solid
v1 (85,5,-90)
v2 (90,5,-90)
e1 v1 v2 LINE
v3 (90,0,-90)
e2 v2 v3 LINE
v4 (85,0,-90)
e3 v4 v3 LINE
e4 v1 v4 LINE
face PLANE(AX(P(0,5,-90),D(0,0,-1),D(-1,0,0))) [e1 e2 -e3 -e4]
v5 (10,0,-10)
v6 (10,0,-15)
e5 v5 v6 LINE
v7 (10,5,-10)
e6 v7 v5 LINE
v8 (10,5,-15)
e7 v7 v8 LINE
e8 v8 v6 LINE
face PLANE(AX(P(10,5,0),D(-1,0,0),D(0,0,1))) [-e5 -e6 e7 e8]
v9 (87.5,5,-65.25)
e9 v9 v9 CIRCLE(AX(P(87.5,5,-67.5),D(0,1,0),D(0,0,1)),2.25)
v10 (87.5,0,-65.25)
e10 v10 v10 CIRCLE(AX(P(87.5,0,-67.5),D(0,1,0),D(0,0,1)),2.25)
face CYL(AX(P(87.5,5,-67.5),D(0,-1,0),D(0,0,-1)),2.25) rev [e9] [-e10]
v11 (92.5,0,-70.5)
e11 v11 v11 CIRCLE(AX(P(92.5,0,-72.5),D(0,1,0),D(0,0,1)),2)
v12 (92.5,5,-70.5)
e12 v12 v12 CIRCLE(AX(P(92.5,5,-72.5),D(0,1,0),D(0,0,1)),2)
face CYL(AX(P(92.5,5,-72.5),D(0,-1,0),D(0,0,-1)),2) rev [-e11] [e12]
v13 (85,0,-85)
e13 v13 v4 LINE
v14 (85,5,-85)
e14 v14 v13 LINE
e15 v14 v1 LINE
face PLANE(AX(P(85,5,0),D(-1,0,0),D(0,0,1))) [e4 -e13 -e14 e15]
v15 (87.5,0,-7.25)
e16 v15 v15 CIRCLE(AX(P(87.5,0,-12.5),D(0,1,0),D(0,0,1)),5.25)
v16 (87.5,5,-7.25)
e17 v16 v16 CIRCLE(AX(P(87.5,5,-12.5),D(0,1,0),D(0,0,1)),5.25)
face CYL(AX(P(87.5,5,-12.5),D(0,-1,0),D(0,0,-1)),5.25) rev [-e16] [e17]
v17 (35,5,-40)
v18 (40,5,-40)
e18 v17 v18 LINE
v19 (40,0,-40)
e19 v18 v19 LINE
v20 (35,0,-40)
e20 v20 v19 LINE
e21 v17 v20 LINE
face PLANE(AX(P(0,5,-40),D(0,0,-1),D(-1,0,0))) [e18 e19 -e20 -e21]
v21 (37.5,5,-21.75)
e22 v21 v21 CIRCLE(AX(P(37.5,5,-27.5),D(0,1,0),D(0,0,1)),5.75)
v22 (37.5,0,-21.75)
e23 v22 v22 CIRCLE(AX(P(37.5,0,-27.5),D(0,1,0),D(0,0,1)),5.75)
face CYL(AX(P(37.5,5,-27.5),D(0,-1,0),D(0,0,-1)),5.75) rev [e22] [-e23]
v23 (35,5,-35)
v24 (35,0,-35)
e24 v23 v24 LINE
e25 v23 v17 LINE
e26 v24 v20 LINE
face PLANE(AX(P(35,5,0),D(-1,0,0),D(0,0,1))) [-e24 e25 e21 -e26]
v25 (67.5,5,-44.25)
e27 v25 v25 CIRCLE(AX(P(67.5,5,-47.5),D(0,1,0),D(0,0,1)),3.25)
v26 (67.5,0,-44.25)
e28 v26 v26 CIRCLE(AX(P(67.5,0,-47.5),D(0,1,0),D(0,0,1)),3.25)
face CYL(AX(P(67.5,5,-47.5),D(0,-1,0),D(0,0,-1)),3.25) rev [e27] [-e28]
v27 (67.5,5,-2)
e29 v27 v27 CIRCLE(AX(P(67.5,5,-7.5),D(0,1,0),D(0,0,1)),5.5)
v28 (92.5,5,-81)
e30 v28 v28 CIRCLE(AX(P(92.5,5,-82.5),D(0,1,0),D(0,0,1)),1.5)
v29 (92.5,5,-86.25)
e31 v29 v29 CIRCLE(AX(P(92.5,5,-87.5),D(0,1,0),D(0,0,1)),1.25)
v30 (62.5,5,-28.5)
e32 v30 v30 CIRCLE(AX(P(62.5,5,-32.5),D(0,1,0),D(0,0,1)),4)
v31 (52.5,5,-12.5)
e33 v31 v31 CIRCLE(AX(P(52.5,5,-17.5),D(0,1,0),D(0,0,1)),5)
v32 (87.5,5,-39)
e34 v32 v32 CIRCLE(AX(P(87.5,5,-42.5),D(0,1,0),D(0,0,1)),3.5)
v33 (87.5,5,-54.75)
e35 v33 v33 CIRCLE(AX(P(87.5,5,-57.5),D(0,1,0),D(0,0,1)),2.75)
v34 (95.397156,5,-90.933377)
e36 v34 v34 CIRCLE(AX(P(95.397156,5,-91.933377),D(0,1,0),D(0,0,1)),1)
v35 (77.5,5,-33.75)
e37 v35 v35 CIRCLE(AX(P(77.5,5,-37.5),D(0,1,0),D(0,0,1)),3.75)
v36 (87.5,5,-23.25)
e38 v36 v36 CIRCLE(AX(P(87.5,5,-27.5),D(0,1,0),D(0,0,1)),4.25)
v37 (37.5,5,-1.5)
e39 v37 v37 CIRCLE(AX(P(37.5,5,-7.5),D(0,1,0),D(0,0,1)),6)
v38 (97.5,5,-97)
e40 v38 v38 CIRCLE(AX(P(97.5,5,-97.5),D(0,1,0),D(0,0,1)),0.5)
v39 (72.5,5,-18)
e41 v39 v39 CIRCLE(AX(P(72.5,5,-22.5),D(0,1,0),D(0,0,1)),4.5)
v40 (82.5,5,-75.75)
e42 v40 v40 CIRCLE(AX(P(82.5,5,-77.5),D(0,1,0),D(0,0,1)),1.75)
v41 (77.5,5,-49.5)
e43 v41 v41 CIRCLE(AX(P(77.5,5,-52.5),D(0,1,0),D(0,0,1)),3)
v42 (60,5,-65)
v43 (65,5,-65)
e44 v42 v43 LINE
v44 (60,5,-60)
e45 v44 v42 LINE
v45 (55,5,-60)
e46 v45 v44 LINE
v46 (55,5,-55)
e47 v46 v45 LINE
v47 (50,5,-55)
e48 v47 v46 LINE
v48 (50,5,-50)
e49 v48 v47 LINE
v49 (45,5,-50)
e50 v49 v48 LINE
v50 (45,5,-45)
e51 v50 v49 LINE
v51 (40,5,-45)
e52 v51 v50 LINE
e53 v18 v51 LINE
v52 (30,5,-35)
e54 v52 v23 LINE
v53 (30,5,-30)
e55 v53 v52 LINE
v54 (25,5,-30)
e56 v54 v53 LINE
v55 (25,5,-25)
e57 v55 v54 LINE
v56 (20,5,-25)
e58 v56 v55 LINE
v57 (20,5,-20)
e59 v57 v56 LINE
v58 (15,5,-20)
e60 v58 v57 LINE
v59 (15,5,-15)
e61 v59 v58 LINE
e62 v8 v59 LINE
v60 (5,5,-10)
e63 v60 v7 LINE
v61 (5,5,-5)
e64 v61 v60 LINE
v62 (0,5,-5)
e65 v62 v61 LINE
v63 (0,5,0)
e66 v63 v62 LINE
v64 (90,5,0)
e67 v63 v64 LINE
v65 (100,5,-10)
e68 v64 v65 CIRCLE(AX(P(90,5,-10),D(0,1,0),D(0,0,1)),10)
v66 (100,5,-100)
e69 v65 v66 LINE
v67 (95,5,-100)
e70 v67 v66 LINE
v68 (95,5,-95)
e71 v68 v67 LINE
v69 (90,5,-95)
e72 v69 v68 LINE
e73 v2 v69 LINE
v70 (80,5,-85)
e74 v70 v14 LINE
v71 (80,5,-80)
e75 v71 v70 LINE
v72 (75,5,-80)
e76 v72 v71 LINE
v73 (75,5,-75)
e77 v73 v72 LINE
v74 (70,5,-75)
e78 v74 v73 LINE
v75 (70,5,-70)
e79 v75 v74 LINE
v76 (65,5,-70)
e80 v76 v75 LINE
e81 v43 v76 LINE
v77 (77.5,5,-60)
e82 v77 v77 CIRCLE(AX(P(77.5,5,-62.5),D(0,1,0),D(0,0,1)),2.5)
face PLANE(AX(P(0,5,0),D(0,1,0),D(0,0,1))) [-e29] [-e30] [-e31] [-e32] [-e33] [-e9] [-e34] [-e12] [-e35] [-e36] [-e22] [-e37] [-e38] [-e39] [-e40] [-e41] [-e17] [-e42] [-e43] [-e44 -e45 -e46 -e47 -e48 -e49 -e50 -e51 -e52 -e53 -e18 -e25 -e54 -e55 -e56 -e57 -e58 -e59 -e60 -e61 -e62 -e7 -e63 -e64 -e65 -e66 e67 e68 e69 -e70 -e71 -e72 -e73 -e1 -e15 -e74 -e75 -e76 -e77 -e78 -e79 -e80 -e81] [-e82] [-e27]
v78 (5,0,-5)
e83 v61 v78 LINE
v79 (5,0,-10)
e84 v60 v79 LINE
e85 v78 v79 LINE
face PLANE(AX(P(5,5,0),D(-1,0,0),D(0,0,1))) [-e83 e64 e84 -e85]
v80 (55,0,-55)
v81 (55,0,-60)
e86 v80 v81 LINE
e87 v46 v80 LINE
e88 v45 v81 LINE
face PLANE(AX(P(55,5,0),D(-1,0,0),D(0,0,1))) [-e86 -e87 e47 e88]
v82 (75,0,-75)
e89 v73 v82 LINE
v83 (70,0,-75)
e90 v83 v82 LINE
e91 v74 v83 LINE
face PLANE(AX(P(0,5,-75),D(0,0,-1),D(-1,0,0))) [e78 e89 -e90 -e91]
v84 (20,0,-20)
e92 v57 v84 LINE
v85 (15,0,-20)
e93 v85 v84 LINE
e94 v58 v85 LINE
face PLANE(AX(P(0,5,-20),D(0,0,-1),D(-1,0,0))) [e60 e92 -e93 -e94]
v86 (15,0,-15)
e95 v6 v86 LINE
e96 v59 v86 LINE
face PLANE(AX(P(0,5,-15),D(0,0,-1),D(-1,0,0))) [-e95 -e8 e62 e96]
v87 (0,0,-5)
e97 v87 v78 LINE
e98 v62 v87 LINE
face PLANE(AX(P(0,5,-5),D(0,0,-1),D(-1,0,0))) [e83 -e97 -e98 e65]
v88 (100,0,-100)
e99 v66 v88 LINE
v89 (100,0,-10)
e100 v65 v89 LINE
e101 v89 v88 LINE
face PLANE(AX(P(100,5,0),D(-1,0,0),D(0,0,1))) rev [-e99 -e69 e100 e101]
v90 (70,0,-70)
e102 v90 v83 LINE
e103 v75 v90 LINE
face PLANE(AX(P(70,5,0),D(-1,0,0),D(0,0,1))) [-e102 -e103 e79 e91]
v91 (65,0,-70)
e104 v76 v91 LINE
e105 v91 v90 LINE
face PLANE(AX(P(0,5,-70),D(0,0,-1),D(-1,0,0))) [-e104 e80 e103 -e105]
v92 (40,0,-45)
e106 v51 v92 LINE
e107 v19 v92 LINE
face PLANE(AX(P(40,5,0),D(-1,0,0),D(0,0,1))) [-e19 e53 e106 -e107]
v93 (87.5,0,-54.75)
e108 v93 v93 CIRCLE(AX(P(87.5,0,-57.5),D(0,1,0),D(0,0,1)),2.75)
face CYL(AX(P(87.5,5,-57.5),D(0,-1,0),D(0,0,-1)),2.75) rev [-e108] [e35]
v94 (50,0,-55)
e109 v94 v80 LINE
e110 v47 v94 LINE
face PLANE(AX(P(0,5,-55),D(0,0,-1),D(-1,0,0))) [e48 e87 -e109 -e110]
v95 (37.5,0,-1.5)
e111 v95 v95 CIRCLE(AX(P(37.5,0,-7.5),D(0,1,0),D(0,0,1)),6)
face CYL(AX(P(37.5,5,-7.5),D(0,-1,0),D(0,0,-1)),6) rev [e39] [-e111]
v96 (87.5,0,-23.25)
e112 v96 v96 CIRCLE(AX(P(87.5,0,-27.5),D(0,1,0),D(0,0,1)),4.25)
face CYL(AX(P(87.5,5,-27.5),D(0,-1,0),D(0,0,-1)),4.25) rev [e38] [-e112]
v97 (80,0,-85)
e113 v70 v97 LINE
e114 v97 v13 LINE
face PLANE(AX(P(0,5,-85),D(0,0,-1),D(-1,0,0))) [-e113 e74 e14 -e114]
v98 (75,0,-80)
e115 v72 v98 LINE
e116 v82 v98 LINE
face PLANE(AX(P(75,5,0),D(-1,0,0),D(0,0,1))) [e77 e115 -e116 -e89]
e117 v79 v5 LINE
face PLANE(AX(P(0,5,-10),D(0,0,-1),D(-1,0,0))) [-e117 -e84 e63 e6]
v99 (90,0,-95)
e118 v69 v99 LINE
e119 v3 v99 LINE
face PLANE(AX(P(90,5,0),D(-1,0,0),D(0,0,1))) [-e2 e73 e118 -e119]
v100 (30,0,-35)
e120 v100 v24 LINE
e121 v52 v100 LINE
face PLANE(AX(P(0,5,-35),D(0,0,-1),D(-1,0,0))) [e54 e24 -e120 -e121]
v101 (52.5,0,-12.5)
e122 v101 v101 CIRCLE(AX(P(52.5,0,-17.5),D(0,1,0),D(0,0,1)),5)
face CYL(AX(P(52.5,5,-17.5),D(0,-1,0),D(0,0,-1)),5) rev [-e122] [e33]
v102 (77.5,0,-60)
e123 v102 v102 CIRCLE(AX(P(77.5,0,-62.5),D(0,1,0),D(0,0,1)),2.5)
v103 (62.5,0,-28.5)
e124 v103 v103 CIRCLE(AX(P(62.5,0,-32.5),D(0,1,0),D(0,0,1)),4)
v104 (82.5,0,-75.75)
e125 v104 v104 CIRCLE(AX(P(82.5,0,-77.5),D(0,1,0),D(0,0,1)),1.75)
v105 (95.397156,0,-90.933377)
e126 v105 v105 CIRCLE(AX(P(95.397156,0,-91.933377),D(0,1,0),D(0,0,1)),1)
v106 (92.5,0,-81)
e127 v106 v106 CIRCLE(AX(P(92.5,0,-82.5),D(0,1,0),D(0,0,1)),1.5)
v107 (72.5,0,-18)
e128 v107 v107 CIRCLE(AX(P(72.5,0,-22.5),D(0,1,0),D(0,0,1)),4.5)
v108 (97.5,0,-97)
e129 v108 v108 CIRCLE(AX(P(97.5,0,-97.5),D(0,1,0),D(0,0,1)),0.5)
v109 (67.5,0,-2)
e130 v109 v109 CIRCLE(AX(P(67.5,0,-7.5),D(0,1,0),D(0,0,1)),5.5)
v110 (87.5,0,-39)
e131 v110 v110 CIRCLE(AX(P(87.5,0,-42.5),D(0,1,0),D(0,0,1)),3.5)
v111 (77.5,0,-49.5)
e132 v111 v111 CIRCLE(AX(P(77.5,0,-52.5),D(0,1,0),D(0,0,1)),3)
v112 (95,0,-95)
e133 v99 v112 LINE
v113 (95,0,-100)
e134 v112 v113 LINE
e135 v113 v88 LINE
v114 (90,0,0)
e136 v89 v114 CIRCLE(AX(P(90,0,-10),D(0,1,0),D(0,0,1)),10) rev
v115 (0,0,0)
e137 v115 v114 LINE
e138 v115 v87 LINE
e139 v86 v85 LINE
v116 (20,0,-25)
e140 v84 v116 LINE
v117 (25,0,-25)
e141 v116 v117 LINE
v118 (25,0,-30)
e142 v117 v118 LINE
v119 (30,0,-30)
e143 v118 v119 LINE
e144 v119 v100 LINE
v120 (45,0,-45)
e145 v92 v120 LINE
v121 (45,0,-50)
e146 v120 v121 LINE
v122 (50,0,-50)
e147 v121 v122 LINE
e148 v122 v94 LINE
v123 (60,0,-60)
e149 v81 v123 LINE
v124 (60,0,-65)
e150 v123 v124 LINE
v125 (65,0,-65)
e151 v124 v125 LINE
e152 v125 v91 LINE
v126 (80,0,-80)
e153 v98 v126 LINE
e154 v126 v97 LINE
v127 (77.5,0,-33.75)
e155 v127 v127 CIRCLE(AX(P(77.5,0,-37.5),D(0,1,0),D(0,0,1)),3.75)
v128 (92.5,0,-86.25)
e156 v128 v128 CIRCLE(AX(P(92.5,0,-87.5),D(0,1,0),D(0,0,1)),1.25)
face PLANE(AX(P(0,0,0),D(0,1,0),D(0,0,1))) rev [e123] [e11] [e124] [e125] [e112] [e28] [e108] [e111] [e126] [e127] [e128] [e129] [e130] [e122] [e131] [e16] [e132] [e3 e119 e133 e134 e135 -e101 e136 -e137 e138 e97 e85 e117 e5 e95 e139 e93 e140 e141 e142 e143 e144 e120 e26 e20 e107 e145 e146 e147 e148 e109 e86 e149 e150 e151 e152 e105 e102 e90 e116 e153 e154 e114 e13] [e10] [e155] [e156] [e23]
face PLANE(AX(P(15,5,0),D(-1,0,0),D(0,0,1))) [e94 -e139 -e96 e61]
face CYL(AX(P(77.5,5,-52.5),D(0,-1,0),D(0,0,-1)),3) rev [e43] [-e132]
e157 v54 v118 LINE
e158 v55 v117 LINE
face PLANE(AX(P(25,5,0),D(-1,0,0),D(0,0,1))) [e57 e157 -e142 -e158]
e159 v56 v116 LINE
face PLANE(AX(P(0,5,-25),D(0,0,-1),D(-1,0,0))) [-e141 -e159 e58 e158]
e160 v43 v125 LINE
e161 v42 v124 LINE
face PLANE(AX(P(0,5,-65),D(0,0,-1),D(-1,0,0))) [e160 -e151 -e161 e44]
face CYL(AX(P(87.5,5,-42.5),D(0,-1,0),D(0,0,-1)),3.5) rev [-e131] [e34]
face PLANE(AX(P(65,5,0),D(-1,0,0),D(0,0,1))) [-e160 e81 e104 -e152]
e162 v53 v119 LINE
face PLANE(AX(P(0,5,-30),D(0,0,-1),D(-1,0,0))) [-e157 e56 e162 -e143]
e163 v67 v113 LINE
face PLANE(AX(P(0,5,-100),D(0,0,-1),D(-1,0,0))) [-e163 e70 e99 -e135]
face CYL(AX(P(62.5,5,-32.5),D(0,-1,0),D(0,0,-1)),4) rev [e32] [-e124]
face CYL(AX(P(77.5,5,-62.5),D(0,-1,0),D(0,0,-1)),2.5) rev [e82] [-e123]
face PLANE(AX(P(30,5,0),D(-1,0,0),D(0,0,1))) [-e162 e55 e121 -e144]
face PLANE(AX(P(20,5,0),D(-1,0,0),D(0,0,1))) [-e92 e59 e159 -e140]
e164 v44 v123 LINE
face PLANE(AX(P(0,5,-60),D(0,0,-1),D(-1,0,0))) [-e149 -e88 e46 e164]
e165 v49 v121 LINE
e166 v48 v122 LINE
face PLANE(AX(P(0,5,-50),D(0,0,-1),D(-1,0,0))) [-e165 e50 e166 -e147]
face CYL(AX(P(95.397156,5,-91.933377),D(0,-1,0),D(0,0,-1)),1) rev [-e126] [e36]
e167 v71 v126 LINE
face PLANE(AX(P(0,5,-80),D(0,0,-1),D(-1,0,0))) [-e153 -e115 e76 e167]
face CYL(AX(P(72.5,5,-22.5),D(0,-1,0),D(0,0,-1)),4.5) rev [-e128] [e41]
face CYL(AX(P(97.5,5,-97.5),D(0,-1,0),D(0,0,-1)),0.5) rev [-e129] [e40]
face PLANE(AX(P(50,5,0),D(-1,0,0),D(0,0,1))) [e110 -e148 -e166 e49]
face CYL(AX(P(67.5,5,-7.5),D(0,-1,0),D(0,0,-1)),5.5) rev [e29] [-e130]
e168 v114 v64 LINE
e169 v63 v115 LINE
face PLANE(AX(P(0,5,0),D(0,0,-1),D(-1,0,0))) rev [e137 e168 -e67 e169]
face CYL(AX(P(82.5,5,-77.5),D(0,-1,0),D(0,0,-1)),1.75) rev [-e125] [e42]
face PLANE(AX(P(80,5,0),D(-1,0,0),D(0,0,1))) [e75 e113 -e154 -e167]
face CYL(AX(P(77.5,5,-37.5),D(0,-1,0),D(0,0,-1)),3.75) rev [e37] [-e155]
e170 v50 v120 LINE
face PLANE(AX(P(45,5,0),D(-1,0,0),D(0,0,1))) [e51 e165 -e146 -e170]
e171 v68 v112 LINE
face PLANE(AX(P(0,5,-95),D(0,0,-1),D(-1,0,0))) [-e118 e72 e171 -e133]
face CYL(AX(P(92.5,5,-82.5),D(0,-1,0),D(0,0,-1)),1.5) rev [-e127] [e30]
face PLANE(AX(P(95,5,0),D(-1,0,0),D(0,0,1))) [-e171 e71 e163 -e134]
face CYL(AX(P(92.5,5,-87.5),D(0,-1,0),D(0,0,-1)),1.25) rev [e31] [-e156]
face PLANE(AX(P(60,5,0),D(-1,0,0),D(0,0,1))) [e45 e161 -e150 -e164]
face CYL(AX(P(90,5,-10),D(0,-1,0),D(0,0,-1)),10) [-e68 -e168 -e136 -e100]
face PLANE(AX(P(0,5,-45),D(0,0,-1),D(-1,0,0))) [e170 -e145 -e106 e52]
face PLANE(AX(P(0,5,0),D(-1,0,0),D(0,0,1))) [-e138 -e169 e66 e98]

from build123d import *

# Parameters (mm, degrees)
BOSS_EXTRUDE1_OUTLINE_R    = 6
BOSS_EXTRUDE1_OUTLINE_R_2  = 5.75
BOSS_EXTRUDE1_OUTLINE_R_3  = 5.5
BOSS_EXTRUDE1_OUTLINE_R_4  = 5
BOSS_EXTRUDE1_OUTLINE_R_5  = 4.5
BOSS_EXTRUDE1_OUTLINE_R_6  = 5.25
BOSS_EXTRUDE1_OUTLINE_R_7  = 4
BOSS_EXTRUDE1_OUTLINE_R_8  = 3.25
BOSS_EXTRUDE1_OUTLINE_R_9  = 4.25
BOSS_EXTRUDE1_OUTLINE_R_10 = 3.75
BOSS_EXTRUDE1_OUTLINE_R_11 = 3.5
BOSS_EXTRUDE1_OUTLINE_R_12 = 3
BOSS_EXTRUDE1_OUTLINE_R_13 = 2.75
BOSS_EXTRUDE1_OUTLINE_R_14 = 2.5
BOSS_EXTRUDE1_OUTLINE_R_15 = 2.25
BOSS_EXTRUDE1_OUTLINE_R_16 = 2
BOSS_EXTRUDE1_OUTLINE_R_17 = 1.75
BOSS_EXTRUDE1_OUTLINE_R_18 = 1.5
BOSS_EXTRUDE1_OUTLINE_R_19 = 1.25
BOSS_EXTRUDE1_OUTLINE_R_20 = 1
BOSS_EXTRUDE1_OUTLINE_R_21 = 0.5
BOSS_EXTRUDE1_DEPTH        = 5
FILLET1_R                  = 10


# Read off the part's stored shape, not the designer's step: Boss-Extrude1
with BuildPart() as part:
    # Boss-Extrude1 outline → Boss-Extrude1 (new body)
    with BuildSketch(Plane(origin=(0, 0, 0), x_dir=(1, 0, 0), z_dir=(0, 1, 0))):
        Polygon((60, 65), (60, 60), (55, 60), (55, 55), (50, 55), (50, 50), (45, 50), (45, 45), (40, 45), (40, 40), (35, 40), (35, 35), (30, 35), (30, 30), (25, 30), (25, 25), (20, 25), (20, 20), (15, 20), (15, 15), (10, 15), (10, 10), (5, 10), (5, 5), (0, 5), (0, 0), (100, 0), (100, 100), (95, 100), (95, 95), (90, 95), (90, 90), (85, 90), (85, 85), (80, 85), (80, 80), (75, 80), (75, 75), (70, 75), (70, 70), (65, 70), (65, 65), align=None)
        with Locations((37.5, 7.5)):
            Circle(BOSS_EXTRUDE1_OUTLINE_R, mode=Mode.SUBTRACT)
        with Locations((37.5, 27.5)):
            Circle(BOSS_EXTRUDE1_OUTLINE_R_2, mode=Mode.SUBTRACT)
        with Locations((67.5, 7.5)):
            Circle(BOSS_EXTRUDE1_OUTLINE_R_3, mode=Mode.SUBTRACT)
        with Locations((52.5, 17.5)):
            Circle(BOSS_EXTRUDE1_OUTLINE_R_4, mode=Mode.SUBTRACT)
        with Locations((72.5, 22.5)):
            Circle(BOSS_EXTRUDE1_OUTLINE_R_5, mode=Mode.SUBTRACT)
        with Locations((87.5, 12.5)):
            Circle(BOSS_EXTRUDE1_OUTLINE_R_6, mode=Mode.SUBTRACT)
        with Locations((62.5, 32.5)):
            Circle(BOSS_EXTRUDE1_OUTLINE_R_7, mode=Mode.SUBTRACT)
        with Locations((67.5, 47.5)):
            Circle(BOSS_EXTRUDE1_OUTLINE_R_8, mode=Mode.SUBTRACT)
        with Locations((87.5, 27.5)):
            Circle(BOSS_EXTRUDE1_OUTLINE_R_9, mode=Mode.SUBTRACT)
        with Locations((77.5, 37.5)):
            Circle(BOSS_EXTRUDE1_OUTLINE_R_10, mode=Mode.SUBTRACT)
        with Locations((87.5, 42.5)):
            Circle(BOSS_EXTRUDE1_OUTLINE_R_11, mode=Mode.SUBTRACT)
        with Locations((77.5, 52.5)):
            Circle(BOSS_EXTRUDE1_OUTLINE_R_12, mode=Mode.SUBTRACT)
        with Locations((87.5, 57.5)):
            Circle(BOSS_EXTRUDE1_OUTLINE_R_13, mode=Mode.SUBTRACT)
        with Locations((77.5, 62.5)):
            Circle(BOSS_EXTRUDE1_OUTLINE_R_14, mode=Mode.SUBTRACT)
        with Locations((87.5, 67.5)):
            Circle(BOSS_EXTRUDE1_OUTLINE_R_15, mode=Mode.SUBTRACT)
        with Locations((92.5, 72.5)):
            Circle(BOSS_EXTRUDE1_OUTLINE_R_16, mode=Mode.SUBTRACT)
        with Locations((82.5, 77.5)):
            Circle(BOSS_EXTRUDE1_OUTLINE_R_17, mode=Mode.SUBTRACT)
        with Locations((92.5, 82.5)):
            Circle(BOSS_EXTRUDE1_OUTLINE_R_18, mode=Mode.SUBTRACT)
        with Locations((92.5, 87.5)):
            Circle(BOSS_EXTRUDE1_OUTLINE_R_19, mode=Mode.SUBTRACT)
        with Locations((95.397156107, 91.933376666)):
            Circle(BOSS_EXTRUDE1_OUTLINE_R_20, mode=Mode.SUBTRACT)
        with Locations((97.5, 97.5)):
            Circle(BOSS_EXTRUDE1_OUTLINE_R_21, mode=Mode.SUBTRACT)
    extrude(amount=BOSS_EXTRUDE1_DEPTH)

    # Fillet1
    fillet1_edges = [part.edges().sort_by_distance(p)[0] for p in [
        (100, 2.5, 0),
    ]]
    fillet(fillet1_edges, radius=FILLET1_R)


solid = part.part
